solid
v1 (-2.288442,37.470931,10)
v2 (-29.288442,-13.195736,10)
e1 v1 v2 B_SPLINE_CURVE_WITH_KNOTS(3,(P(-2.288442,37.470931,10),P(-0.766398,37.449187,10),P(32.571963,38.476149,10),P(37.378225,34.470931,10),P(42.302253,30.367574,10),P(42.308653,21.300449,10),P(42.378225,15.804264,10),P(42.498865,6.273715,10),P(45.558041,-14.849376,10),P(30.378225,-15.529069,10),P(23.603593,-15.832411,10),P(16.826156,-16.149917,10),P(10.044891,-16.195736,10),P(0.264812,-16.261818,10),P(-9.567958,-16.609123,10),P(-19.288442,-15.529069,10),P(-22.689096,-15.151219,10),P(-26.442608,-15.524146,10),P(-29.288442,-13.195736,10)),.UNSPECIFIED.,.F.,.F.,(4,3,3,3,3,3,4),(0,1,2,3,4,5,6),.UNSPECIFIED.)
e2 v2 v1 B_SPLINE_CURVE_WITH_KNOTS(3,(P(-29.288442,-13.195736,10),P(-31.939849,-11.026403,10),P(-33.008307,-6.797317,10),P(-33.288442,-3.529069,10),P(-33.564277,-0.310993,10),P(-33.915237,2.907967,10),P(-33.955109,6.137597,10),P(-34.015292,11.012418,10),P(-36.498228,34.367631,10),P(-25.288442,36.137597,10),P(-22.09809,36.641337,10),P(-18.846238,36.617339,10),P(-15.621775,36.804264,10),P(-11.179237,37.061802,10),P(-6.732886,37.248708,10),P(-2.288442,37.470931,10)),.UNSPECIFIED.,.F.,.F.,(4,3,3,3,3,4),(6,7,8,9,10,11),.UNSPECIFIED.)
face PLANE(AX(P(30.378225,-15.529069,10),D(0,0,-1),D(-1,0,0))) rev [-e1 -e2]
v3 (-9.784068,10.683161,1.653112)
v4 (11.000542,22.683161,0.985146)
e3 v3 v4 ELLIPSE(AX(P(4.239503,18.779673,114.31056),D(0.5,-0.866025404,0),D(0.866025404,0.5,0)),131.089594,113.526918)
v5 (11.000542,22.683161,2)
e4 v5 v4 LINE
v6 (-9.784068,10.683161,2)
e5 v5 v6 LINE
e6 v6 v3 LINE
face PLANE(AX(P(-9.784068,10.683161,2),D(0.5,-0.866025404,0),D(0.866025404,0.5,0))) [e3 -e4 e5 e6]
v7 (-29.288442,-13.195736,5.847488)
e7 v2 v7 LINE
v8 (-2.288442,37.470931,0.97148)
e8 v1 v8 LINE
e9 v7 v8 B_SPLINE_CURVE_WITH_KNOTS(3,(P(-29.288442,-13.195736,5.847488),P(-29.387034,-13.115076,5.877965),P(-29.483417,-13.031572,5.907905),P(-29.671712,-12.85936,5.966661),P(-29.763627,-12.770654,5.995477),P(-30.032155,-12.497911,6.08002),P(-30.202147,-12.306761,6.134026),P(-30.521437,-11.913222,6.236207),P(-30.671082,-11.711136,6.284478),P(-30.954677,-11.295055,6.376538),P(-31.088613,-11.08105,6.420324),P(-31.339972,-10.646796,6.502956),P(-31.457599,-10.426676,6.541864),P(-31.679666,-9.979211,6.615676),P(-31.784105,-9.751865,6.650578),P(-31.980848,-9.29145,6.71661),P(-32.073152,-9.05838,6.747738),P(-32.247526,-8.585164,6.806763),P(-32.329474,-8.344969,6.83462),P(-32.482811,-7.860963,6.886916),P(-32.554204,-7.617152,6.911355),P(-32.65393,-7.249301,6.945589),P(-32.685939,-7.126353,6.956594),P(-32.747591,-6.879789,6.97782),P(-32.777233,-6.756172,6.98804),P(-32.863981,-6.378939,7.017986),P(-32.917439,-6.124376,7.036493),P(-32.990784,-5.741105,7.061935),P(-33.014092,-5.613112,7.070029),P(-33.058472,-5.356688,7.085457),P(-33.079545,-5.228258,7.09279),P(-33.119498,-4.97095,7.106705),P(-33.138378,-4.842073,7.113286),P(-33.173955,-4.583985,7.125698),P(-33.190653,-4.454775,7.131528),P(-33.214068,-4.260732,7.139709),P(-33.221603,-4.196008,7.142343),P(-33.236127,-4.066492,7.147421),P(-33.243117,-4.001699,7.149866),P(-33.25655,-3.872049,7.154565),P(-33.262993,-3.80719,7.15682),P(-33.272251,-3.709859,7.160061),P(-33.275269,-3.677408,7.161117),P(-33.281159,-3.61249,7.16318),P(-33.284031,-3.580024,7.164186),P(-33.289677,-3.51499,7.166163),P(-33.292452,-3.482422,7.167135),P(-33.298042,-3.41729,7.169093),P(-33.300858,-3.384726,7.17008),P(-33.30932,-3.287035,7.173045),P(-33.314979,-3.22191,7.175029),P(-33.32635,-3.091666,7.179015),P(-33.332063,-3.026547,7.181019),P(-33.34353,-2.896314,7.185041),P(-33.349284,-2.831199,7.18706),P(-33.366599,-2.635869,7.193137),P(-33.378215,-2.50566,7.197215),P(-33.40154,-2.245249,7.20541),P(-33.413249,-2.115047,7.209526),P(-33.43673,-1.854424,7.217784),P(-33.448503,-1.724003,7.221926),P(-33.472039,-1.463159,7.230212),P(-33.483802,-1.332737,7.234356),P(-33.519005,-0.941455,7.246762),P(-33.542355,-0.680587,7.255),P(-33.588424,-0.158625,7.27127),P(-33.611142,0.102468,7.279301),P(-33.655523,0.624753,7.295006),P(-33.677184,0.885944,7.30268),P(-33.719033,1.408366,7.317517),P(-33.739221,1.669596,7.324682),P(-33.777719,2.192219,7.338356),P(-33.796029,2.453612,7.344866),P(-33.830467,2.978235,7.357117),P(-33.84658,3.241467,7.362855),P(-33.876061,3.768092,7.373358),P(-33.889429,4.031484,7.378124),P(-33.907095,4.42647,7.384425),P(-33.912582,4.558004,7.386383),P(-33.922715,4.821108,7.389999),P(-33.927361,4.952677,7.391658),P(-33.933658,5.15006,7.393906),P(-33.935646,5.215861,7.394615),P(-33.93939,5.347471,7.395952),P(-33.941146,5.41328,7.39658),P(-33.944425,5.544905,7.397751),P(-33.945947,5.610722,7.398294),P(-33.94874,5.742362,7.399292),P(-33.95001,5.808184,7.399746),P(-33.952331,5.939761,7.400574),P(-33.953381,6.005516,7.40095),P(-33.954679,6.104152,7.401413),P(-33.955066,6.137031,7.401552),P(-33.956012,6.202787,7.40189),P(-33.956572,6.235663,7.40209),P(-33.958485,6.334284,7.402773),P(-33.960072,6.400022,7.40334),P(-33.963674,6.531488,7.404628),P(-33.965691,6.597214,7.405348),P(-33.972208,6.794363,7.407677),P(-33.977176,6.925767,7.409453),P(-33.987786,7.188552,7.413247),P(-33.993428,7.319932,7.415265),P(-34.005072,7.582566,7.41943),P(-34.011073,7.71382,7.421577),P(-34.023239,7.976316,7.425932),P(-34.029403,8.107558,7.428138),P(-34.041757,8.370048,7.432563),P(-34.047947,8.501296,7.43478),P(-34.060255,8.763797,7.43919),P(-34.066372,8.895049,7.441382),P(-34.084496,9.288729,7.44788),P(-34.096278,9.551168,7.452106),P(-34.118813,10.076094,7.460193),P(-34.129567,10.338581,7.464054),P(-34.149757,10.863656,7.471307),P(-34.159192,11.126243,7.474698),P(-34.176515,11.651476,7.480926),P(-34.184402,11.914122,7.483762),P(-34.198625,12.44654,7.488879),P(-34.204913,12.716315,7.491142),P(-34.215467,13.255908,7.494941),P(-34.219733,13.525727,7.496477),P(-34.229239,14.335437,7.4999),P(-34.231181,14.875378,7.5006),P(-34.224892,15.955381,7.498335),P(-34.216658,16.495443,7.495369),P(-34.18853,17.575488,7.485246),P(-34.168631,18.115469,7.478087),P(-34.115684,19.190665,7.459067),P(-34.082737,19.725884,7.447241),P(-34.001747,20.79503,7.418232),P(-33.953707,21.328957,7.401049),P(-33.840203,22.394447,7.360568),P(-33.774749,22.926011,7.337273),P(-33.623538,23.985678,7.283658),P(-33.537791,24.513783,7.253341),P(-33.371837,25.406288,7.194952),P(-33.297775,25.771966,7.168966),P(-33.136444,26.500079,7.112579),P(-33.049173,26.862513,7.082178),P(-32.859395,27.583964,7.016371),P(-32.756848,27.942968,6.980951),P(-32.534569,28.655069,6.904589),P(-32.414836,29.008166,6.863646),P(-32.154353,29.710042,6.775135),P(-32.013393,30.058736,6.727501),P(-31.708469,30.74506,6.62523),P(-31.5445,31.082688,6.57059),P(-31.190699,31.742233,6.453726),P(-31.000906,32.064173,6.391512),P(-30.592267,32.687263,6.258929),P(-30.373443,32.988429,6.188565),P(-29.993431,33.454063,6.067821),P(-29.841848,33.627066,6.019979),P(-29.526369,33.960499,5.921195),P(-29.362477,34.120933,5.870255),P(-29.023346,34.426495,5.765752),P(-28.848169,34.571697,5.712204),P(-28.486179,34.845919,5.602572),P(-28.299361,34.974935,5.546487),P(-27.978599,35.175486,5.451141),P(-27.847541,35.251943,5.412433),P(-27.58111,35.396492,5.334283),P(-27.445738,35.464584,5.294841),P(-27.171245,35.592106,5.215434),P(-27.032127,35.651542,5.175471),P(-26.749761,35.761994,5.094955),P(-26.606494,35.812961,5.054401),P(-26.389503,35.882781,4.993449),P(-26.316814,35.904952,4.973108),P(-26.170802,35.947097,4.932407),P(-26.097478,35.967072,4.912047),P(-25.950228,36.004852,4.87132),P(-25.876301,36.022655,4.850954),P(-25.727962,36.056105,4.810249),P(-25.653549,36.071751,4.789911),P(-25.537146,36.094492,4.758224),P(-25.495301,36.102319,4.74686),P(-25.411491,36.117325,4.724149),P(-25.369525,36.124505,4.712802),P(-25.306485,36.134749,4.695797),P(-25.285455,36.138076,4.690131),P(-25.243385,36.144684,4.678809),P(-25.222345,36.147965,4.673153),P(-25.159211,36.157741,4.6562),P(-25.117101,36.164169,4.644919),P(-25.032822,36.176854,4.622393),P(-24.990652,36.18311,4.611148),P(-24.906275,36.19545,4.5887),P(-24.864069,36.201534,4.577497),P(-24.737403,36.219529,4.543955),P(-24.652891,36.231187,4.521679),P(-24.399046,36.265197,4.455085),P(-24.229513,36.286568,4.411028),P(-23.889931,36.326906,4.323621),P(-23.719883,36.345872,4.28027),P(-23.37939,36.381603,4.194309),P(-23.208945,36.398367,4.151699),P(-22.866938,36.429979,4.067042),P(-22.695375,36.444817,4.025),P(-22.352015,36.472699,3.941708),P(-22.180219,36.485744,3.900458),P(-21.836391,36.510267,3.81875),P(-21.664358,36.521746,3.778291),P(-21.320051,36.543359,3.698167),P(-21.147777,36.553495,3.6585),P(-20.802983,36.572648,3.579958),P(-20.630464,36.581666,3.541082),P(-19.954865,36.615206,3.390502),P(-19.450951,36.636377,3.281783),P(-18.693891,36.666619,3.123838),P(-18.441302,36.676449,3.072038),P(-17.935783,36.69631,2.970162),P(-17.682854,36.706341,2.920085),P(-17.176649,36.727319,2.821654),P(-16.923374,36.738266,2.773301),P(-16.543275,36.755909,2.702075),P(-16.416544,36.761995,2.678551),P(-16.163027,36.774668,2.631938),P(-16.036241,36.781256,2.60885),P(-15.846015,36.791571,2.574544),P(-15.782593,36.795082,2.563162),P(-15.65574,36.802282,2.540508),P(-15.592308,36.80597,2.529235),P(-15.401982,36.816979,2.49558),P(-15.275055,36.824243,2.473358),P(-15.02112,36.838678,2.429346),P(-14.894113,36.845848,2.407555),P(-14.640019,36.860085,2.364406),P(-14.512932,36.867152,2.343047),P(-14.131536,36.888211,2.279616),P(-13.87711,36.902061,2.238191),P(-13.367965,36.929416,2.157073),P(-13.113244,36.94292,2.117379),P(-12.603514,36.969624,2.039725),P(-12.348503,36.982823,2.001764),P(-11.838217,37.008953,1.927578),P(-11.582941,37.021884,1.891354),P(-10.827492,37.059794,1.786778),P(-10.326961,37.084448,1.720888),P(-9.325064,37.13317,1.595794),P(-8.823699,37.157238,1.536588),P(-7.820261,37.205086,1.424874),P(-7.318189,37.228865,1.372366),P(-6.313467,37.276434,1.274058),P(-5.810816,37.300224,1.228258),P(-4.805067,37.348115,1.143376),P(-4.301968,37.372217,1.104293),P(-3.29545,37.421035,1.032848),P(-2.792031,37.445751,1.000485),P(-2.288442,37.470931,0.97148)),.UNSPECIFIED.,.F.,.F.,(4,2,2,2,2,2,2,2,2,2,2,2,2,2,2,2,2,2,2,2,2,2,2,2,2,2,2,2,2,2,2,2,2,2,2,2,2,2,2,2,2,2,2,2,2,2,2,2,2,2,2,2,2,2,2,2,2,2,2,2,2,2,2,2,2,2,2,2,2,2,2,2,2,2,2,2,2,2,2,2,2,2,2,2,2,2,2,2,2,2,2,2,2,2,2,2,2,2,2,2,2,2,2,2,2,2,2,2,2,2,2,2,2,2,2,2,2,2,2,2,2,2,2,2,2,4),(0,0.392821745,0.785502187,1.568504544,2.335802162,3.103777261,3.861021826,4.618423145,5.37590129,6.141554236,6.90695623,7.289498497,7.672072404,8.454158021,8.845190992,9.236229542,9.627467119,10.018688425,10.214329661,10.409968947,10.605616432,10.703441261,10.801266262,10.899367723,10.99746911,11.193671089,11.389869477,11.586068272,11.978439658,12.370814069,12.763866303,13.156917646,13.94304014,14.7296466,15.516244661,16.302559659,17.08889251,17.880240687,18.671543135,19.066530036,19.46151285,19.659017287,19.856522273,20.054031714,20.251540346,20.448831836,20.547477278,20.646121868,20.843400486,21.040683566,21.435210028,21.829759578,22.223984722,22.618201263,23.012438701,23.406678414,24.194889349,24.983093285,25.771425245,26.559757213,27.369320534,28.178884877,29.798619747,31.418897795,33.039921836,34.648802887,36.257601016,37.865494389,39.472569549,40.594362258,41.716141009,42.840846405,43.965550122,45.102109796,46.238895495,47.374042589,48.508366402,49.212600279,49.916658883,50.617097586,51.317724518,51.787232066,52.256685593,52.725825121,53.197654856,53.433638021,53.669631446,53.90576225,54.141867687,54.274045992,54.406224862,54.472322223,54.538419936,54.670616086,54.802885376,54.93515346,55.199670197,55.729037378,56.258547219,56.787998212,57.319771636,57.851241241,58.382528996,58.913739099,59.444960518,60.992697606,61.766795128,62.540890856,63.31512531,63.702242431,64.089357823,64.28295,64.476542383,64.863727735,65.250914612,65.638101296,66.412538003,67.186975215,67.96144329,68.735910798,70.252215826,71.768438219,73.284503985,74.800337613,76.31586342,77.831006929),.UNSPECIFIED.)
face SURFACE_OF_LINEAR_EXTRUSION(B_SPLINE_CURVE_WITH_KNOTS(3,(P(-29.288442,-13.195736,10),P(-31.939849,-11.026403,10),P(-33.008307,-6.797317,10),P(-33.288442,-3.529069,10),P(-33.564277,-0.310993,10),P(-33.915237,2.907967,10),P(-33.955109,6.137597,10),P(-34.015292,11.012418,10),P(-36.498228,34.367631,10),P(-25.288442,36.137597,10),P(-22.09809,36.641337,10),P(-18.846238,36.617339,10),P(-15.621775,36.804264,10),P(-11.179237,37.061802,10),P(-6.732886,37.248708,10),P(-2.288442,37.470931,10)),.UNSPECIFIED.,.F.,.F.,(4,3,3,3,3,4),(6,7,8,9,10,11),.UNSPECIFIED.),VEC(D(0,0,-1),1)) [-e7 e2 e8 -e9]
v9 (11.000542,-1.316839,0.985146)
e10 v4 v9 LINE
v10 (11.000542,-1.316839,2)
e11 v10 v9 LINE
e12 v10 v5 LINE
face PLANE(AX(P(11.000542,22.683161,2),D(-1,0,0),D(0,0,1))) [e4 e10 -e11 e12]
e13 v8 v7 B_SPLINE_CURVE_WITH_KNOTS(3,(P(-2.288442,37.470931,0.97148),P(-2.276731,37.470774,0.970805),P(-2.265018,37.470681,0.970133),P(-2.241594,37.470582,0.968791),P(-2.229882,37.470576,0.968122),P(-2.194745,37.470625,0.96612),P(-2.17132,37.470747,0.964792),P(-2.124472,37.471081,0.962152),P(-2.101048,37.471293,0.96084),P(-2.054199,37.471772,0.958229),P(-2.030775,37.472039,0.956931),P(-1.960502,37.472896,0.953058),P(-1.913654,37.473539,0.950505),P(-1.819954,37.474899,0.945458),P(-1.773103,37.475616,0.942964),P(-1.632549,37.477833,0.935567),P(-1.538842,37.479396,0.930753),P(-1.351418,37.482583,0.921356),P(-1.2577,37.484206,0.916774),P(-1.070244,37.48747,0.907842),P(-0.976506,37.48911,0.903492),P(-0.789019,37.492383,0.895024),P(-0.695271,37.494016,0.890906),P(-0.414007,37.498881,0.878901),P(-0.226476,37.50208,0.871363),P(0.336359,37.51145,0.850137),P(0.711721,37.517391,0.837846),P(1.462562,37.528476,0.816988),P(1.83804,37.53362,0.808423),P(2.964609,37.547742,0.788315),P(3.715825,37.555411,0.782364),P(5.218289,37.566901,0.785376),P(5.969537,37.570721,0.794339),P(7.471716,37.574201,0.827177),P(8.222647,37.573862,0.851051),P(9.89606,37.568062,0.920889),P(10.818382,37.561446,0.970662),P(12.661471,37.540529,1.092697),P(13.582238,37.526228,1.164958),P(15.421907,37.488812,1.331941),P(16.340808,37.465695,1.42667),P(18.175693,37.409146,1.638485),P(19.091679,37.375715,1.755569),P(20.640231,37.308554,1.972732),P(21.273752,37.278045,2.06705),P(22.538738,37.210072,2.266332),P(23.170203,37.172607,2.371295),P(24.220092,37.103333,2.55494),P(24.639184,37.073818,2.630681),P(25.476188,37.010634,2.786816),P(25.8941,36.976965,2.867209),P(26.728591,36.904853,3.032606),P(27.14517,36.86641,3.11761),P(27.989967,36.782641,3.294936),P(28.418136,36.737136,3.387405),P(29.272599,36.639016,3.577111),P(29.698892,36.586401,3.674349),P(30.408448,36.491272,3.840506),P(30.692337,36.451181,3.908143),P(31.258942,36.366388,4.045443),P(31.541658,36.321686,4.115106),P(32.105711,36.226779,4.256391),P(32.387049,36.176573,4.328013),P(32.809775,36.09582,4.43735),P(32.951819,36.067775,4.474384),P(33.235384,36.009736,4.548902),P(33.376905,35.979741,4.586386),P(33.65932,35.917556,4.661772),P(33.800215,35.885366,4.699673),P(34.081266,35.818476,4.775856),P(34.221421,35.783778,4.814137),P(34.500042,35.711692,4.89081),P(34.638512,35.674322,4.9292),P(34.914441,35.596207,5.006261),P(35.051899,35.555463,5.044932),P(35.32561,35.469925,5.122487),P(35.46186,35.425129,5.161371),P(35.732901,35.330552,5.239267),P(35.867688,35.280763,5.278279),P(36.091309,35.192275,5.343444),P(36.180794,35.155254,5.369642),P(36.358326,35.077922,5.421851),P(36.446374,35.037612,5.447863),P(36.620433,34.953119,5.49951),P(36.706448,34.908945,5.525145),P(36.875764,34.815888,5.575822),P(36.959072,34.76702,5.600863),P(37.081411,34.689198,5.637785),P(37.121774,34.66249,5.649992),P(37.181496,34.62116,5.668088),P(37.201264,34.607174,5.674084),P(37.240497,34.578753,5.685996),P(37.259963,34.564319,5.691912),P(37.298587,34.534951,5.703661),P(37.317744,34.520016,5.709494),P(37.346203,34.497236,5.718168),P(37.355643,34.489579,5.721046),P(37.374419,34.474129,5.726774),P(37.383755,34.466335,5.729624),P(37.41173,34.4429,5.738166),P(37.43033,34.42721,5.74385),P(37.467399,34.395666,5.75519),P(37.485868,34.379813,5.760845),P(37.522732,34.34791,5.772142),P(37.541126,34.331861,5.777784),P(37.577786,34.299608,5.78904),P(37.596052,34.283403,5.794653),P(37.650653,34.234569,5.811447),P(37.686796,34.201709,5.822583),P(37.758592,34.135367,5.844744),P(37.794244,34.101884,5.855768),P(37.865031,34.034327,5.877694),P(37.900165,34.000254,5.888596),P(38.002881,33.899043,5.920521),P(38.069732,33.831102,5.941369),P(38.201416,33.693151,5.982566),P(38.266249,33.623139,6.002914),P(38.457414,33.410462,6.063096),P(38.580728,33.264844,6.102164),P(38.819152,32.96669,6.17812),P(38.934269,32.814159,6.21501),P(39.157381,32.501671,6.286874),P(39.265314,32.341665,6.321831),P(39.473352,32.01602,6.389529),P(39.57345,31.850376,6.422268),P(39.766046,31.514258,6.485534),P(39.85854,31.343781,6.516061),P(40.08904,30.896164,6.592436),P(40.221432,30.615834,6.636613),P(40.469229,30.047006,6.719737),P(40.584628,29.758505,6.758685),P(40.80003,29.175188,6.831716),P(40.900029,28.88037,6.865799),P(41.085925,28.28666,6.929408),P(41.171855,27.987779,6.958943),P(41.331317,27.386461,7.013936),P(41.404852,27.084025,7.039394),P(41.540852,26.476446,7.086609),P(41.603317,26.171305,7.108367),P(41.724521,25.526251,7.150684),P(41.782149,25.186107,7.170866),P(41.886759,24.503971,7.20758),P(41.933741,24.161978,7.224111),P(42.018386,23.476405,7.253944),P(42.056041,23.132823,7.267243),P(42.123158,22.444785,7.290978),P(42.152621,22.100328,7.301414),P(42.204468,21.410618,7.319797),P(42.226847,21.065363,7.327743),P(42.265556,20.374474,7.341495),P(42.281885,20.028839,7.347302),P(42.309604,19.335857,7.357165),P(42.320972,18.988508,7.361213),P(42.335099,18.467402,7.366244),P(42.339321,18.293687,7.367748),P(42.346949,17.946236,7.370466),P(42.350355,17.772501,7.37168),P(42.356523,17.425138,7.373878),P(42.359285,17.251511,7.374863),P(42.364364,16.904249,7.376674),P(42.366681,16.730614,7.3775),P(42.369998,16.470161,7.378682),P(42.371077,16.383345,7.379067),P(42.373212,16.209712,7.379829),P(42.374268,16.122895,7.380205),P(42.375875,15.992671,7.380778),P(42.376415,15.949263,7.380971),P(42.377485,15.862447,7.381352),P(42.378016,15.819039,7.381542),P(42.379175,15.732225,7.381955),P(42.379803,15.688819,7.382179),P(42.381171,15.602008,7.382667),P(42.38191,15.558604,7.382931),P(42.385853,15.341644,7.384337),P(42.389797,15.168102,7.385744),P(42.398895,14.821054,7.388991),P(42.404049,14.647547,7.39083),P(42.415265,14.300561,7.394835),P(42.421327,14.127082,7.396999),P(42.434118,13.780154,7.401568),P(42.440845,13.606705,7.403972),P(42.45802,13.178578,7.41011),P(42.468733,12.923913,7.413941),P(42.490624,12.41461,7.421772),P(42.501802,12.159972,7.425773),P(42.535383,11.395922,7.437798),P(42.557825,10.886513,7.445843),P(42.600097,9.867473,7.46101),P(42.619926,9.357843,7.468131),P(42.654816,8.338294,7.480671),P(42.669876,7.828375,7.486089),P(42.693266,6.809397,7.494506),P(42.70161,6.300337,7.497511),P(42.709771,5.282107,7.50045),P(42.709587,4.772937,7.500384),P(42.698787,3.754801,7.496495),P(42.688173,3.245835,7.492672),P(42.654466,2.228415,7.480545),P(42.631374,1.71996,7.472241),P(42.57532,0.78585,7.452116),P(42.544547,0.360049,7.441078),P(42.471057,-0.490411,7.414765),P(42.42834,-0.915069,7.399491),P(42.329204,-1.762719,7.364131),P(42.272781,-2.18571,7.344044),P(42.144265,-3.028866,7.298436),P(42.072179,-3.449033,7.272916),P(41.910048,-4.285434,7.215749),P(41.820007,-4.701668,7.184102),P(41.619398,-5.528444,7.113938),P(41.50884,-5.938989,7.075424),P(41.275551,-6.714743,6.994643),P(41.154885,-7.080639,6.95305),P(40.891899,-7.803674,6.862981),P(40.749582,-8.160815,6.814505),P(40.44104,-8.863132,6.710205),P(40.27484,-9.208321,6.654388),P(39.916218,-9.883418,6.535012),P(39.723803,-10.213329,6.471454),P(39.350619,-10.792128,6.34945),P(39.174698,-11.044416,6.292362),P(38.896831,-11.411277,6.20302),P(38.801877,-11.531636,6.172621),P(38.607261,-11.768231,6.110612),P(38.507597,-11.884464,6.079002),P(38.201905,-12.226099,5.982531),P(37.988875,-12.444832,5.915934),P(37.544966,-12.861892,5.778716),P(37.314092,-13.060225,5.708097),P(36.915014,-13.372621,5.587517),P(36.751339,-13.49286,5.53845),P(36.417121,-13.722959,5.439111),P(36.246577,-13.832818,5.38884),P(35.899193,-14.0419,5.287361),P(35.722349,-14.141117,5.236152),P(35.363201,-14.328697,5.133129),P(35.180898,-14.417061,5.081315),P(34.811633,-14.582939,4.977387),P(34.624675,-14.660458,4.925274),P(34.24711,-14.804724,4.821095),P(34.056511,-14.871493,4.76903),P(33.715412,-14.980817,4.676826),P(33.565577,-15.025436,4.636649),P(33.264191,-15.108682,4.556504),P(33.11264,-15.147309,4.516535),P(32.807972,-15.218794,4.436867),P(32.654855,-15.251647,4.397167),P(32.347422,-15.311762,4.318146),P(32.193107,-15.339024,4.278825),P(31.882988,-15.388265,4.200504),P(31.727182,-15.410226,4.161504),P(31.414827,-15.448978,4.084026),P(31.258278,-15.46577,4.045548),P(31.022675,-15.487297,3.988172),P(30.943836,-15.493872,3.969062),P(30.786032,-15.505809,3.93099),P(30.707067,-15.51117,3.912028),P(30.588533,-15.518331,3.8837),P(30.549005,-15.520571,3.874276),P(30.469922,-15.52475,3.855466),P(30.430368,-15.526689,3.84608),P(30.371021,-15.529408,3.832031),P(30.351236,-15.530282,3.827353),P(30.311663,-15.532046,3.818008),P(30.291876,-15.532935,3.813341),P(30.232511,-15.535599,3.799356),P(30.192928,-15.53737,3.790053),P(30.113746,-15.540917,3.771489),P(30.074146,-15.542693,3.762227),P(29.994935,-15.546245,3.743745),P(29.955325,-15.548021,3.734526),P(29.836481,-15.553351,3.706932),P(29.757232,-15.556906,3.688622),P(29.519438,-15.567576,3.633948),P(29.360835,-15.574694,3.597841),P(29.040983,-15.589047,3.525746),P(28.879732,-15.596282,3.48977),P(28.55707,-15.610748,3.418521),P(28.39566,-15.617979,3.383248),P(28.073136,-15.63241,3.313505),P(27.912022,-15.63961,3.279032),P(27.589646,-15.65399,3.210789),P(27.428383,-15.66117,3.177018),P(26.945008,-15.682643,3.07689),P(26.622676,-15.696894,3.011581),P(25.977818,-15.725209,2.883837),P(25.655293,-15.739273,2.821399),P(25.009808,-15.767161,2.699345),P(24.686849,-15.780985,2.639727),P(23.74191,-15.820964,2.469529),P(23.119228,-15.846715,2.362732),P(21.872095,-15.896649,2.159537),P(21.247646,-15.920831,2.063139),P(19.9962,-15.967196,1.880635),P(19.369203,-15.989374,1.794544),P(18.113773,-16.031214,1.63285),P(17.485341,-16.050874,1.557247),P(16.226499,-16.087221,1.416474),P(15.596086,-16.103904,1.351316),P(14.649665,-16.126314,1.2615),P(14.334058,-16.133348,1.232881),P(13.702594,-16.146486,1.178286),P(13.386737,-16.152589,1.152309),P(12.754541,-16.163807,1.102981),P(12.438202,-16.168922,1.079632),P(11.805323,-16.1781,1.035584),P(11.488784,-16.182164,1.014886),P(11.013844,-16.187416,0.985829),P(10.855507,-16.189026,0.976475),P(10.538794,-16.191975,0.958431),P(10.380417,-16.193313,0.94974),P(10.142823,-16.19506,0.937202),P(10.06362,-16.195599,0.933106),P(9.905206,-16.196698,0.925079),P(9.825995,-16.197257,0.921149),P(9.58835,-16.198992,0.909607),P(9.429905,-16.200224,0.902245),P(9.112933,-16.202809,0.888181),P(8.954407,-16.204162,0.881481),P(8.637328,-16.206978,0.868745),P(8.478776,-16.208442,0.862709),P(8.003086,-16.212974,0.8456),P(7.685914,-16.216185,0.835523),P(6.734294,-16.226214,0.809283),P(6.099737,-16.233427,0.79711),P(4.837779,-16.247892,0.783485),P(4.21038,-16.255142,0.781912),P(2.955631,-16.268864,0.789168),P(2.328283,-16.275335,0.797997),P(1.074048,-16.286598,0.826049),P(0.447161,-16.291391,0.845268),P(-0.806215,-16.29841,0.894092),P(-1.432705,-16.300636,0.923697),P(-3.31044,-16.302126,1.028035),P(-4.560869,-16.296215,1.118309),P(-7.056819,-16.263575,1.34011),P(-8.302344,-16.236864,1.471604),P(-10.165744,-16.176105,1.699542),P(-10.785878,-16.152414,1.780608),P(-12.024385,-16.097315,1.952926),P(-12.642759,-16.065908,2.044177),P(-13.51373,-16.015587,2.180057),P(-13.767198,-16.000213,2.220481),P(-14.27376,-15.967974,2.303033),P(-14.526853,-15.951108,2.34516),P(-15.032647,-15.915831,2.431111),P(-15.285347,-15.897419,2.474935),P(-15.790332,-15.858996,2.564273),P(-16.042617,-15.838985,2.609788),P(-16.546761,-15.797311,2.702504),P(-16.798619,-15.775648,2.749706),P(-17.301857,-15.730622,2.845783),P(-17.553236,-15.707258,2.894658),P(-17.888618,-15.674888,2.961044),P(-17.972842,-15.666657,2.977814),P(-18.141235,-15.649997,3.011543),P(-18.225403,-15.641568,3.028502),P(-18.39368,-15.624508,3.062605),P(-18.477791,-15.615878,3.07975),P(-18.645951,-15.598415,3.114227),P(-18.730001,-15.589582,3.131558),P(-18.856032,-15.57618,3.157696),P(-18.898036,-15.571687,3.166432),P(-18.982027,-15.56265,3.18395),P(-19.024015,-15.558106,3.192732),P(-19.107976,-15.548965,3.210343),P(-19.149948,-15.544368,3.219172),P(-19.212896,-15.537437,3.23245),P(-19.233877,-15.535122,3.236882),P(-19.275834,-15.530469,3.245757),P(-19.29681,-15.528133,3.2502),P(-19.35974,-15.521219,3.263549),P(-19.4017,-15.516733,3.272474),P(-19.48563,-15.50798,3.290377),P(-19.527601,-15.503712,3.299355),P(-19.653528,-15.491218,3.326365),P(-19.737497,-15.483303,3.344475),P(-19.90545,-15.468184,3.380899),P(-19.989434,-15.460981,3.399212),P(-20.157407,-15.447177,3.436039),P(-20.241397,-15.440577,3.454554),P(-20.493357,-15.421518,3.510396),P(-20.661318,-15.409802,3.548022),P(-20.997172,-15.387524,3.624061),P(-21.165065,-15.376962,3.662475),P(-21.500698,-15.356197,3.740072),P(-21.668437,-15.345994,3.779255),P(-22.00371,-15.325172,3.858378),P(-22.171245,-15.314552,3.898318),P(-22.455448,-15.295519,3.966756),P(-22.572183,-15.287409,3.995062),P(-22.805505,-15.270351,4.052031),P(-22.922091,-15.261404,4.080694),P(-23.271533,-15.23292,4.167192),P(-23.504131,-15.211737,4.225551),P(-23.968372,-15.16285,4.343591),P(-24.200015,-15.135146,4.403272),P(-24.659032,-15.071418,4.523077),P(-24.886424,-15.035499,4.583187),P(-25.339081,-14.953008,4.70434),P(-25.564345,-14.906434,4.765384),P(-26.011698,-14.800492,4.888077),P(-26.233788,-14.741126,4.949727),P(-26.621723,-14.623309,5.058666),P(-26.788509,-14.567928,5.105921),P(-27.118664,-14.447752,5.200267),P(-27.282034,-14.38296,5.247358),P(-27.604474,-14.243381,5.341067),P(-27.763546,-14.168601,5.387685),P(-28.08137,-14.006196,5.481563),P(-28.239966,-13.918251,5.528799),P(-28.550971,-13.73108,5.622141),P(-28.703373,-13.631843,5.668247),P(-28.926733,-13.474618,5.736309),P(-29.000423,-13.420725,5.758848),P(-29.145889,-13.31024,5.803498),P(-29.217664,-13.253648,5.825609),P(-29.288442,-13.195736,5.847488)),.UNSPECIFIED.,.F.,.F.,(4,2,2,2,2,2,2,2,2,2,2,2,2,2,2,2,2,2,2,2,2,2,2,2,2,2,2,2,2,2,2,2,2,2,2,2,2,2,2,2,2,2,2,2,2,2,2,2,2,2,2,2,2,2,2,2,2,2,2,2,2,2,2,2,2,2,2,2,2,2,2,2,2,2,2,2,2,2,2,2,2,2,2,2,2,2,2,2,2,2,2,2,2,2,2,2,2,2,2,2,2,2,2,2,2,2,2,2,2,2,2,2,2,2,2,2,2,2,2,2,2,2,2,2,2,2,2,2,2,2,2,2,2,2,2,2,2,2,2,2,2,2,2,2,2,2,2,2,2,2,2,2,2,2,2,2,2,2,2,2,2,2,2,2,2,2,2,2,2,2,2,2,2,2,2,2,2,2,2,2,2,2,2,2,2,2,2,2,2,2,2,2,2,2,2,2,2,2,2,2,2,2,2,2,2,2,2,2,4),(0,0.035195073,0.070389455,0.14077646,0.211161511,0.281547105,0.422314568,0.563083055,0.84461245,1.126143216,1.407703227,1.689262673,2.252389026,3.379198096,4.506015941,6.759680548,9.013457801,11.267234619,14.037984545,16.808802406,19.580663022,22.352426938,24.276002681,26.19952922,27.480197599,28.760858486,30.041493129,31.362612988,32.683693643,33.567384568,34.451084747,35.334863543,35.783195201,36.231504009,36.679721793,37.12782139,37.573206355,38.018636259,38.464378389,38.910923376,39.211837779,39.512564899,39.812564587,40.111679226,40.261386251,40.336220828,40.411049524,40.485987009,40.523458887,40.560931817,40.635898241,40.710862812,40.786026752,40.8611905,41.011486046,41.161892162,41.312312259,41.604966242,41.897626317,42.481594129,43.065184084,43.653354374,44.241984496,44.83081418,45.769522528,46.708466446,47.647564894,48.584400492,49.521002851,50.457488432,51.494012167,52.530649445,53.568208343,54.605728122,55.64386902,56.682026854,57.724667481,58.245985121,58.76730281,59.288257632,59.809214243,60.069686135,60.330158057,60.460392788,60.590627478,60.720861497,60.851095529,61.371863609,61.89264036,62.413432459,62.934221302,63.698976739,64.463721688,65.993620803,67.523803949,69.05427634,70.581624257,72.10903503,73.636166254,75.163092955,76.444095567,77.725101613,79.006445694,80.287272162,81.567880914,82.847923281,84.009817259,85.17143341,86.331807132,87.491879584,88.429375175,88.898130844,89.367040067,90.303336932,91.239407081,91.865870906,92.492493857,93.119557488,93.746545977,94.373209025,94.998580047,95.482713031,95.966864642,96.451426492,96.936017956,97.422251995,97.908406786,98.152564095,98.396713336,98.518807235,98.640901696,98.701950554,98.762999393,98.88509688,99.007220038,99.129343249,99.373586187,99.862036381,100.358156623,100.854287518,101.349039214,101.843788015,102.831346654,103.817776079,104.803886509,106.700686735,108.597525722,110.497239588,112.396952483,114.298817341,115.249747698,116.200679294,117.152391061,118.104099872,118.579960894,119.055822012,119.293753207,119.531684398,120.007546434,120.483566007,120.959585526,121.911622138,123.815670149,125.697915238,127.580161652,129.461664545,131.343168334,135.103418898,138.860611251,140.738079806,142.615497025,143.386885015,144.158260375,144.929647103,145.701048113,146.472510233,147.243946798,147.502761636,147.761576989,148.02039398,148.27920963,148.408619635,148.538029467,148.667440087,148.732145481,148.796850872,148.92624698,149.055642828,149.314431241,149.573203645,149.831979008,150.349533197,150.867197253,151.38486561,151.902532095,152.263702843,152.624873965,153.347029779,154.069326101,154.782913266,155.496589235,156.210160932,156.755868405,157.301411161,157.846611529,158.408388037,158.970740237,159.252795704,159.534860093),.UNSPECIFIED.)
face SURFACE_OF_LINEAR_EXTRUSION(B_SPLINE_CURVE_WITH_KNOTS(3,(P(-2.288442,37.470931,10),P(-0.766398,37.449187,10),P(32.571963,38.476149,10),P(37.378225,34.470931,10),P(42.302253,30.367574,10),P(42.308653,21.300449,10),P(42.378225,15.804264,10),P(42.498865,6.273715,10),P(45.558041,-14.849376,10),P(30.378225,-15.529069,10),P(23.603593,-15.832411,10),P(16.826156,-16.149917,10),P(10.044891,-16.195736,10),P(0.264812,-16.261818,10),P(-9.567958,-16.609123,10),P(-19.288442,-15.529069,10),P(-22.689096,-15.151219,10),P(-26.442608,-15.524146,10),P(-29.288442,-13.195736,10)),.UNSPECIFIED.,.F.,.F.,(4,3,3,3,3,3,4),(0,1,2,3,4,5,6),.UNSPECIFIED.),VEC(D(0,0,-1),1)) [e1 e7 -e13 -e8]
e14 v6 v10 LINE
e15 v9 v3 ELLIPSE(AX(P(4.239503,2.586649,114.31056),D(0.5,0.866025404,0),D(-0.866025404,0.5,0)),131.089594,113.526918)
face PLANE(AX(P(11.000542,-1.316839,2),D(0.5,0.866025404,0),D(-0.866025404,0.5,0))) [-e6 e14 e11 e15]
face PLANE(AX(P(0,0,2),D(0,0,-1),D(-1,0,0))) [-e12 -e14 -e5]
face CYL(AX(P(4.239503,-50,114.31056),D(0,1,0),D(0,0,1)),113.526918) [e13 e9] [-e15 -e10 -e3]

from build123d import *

# Parameters (mm, degrees)
EXTRUDE_1_DEPTH     = 10
CUT_EXTRUDE_2_DEPTH = 50
CUT_EXTRUDE_3_DEPTH = 2


with BuildPart() as part:
    # 스케치1 → 보스-돌출1 (new body)
    with BuildSketch(Plane.XY):
        with BuildLine():
            add(Edge.make_bspline(
                [(-29.288442009, -13.19573609), (-31.939849282, -11.026402867), (-33.008306535, -6.797316626), (-33.288442009, -3.529069423), (-33.564277103, -0.310993326), (-33.915236702, 2.90796739), (-33.955108676, 6.137597243), (-34.015291649, 11.012418115), (-36.498228289, 34.367630989), (-25.288442009, 36.137597243), (-22.098090146, 36.641337011), (-18.846237728, 36.617338554), (-15.621775342, 36.80426391), (-11.179237431, 37.06180234), (-6.732886454, 37.248708354), (-2.288442009, 37.470930577)],
                knots=[6, 6, 6, 6, 7, 7, 7, 8, 8, 8, 9, 9, 9, 10, 10, 10, 11, 11, 11, 11], degree=3))
            add(Edge.make_bspline(
                [(-2.288442009, 37.470930577), (-0.766398092, 37.449187092), (32.571962963, 38.476148655), (37.378224658, 34.470930577), (42.302253046, 30.367573586), (42.308652696, 21.300448881), (42.378224658, 15.80426391), (42.498864518, 6.27371497), (45.558040963, -14.849376156), (30.378224658, -15.529069423), (23.603592703, -15.832411153), (16.826156317, -16.149916732), (10.044891324, -16.19573609), (0.264811866, -16.261817708), (-9.567958231, -16.609123177), (-19.288442009, -15.529069423), (-22.6890963, -15.151218947), (-26.442607952, -15.524145773), (-29.288442009, -13.19573609)],
                knots=[0, 0, 0, 0, 1, 1, 1, 2, 2, 2, 3, 3, 3, 4, 4, 4, 5, 5, 5, 6, 6, 6, 6], degree=3))
        make_face()
    extrude(amount=EXTRUDE_1_DEPTH)

    # 스케치3 → 컷-돌출2 (cut, symmetric)
    with BuildSketch(Plane(origin=(0, 0, 0), x_dir=(1, 0, 0), z_dir=(0, 1, 0))):
        with BuildLine():
            Line((-34.229516124, 0), (42.708521258, 0))
            Line((42.708521258, 0), (42.708521258, -7.5))
            ThreePointArc((42.708521258, -7.5), (4.239502567, -0.783641945), (-34.229516124, -7.5))
            Line((-34.229516124, -7.5), (-34.229516124, 0))
        make_face()
    extrude(amount=CUT_EXTRUDE_2_DEPTH, both=True, mode=Mode.SUBTRACT)

    # 스케치4 → 컷-돌출3 (cut)
    with BuildSketch(Plane.XY):
        Polygon((11.000542022, 22.683160895), (11.000542022, -1.316839105), (-9.784067669, 10.683160895), align=None)
    extrude(amount=CUT_EXTRUDE_3_DEPTH, mode=Mode.SUBTRACT)


solid = part.part
